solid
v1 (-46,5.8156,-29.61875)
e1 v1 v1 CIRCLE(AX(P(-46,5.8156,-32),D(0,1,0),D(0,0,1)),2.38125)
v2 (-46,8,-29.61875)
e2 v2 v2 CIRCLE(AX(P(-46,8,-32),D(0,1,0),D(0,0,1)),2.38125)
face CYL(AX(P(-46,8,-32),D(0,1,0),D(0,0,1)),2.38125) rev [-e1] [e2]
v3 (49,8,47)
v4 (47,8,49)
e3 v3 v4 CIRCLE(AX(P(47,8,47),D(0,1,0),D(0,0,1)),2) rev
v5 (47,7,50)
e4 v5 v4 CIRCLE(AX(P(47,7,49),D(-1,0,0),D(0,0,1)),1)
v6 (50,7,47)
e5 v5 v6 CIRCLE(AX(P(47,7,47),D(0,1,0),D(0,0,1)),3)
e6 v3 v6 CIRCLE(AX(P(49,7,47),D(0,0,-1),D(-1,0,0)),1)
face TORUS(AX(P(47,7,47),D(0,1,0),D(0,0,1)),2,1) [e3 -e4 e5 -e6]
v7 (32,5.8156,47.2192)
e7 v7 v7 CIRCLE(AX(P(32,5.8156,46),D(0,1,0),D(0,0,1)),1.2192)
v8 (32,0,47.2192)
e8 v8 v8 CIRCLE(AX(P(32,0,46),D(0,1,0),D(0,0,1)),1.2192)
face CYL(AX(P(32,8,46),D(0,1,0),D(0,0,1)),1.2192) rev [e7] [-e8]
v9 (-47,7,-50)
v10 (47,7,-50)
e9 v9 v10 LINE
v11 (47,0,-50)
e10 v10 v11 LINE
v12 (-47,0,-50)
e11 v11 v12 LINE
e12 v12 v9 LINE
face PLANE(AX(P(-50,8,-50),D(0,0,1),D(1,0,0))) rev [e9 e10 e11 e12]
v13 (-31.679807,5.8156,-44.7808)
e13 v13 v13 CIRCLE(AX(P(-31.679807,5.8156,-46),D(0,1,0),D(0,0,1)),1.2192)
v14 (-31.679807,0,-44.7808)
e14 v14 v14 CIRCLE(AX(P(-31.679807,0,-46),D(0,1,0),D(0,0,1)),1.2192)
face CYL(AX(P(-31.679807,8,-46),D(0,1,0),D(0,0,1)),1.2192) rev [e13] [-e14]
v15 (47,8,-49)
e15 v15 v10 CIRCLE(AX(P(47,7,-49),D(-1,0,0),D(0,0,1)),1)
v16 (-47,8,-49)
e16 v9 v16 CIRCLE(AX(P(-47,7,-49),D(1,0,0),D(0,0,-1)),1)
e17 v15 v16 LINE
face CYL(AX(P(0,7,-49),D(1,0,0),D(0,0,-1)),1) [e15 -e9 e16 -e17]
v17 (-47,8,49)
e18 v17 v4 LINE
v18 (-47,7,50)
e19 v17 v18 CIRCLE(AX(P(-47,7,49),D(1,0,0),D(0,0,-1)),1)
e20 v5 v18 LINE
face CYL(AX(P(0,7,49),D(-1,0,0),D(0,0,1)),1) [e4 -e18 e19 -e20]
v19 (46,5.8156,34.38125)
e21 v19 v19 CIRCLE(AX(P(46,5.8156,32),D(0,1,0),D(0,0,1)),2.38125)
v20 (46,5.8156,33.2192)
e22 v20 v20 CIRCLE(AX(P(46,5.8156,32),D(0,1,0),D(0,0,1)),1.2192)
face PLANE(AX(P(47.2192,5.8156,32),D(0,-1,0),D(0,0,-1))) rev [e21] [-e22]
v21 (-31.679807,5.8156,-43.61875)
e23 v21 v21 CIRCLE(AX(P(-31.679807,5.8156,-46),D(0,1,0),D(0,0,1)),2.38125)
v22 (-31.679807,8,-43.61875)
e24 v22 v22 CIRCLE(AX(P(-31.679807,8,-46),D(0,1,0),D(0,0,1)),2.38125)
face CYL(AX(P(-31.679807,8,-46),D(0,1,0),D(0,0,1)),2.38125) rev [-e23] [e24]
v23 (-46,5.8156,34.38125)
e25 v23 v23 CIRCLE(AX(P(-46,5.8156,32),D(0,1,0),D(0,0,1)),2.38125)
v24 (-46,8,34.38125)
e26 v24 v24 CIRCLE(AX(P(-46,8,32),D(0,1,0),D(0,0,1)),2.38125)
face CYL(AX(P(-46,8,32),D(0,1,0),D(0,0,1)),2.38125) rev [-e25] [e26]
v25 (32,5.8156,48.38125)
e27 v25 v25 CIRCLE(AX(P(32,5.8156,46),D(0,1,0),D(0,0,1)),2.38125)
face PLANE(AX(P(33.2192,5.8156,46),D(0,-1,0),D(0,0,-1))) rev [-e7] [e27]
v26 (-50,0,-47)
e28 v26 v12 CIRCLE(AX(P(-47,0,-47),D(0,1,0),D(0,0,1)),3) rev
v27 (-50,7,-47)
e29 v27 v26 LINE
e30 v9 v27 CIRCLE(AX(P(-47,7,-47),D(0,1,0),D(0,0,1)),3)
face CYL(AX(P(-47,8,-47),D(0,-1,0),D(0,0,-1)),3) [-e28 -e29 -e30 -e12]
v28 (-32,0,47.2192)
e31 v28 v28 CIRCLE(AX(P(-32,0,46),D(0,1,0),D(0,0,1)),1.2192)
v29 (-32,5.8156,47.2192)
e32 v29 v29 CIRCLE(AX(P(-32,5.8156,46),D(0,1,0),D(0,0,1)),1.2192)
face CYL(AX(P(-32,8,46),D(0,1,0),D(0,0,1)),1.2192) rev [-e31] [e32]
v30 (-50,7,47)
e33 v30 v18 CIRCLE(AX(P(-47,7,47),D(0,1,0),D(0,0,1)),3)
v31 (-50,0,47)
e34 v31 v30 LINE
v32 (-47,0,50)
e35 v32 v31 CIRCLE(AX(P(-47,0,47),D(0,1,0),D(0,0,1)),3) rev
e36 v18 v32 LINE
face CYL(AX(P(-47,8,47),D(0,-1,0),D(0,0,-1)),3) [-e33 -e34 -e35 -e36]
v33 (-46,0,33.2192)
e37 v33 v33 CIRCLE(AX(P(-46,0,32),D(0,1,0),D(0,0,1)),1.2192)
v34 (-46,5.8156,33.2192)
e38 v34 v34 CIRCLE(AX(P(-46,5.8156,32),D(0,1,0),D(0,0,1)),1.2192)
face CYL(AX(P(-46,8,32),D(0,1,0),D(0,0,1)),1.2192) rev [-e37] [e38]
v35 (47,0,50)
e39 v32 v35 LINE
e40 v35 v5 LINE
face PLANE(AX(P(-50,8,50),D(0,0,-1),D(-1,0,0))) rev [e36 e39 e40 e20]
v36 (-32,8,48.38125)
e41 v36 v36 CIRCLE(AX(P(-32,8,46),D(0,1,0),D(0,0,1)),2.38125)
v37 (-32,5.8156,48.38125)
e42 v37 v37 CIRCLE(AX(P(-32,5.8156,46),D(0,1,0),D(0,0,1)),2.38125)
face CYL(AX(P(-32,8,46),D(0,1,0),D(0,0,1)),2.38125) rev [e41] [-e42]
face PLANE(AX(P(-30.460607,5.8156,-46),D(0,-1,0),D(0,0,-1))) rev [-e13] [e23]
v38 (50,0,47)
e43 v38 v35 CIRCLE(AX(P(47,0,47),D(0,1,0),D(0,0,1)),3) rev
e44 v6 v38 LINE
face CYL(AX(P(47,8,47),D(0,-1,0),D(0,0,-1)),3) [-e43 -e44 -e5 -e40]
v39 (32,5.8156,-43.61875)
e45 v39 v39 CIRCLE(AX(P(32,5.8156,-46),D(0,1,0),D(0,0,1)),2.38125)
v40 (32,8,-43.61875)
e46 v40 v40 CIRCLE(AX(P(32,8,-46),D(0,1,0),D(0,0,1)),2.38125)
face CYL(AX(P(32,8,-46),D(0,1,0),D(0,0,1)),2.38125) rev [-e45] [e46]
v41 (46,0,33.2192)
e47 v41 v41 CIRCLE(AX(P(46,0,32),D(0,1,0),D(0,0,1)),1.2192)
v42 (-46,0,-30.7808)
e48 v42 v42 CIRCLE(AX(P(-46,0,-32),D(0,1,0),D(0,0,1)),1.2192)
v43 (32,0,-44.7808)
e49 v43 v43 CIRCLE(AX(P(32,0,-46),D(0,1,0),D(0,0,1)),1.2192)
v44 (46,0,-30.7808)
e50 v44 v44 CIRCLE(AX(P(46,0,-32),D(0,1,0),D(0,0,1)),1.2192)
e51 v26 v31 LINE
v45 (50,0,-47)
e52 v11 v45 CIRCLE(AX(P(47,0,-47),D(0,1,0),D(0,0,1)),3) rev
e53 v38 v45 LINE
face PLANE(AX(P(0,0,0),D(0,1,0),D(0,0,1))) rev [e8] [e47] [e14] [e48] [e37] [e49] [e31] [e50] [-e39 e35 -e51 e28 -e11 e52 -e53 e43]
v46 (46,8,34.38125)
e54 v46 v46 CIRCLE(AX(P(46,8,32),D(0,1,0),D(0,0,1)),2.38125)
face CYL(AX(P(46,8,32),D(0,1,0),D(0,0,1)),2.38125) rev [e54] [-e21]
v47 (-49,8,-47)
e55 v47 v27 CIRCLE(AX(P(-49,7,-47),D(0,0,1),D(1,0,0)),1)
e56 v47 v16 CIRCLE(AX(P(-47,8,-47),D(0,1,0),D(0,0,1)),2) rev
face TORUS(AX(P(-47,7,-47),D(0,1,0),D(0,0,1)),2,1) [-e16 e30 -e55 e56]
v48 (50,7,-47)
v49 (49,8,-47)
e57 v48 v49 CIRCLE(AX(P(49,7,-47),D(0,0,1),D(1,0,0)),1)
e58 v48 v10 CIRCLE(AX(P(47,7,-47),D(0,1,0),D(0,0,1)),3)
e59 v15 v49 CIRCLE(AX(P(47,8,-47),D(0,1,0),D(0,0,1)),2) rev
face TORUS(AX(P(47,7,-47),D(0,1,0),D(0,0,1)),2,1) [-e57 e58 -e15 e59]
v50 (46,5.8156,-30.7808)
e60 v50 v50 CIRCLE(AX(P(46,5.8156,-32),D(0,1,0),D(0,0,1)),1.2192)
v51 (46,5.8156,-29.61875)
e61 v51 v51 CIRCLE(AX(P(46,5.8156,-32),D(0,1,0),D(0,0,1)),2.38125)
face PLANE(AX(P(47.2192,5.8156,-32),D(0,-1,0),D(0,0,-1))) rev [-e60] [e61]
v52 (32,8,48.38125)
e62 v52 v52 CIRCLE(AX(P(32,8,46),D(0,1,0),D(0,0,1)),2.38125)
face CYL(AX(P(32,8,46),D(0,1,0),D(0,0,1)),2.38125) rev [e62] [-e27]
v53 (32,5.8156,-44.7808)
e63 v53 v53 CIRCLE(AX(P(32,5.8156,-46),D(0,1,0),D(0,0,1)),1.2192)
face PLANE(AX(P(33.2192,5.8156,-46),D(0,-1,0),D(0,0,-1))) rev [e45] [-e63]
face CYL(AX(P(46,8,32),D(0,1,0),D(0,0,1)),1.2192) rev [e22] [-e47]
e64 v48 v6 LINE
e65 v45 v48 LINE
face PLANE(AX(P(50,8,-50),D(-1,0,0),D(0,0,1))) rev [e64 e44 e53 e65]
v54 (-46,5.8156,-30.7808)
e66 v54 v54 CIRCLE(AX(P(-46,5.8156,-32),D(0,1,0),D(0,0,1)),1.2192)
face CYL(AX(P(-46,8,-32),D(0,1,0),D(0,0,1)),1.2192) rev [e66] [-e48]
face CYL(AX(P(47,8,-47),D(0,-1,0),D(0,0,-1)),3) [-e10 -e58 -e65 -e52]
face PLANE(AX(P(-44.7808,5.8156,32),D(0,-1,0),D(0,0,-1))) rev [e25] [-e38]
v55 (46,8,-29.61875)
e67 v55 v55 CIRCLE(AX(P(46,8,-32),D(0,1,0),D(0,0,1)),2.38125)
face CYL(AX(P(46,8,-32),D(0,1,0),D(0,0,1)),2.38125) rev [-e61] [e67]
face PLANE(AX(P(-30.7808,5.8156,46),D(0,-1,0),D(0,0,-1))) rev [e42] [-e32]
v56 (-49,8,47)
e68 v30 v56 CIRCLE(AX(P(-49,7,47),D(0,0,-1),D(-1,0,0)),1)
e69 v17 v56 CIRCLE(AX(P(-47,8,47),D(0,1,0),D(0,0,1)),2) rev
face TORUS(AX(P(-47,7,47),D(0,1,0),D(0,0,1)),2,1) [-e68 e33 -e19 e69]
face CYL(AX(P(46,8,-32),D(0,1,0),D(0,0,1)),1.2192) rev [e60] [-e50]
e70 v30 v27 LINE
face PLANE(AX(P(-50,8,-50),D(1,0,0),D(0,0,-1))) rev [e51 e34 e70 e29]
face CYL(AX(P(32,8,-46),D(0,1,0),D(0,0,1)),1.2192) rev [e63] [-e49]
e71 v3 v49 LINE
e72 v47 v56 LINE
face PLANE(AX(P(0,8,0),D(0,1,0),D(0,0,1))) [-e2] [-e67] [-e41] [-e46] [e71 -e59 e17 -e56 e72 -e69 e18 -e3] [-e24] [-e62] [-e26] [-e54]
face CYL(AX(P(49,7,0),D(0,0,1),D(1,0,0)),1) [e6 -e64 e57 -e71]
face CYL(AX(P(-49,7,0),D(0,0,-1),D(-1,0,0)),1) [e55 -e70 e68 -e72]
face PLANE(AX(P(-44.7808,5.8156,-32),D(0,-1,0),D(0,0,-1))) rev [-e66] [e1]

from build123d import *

# Parameters (mm, degrees)
SKETCH3_W                                      = 100
SKETCH3_H                                      = 100
BOSS_EXTRUDE2_DEPTH                            = 8
CBORE_FOR_2_SOCKET_HEAD_CAP_SCREW1_D           = 2.4384
CBORE_FOR_2_SOCKET_HEAD_CAP_SCREW1_CBORE_D     = 4.7625
CBORE_FOR_2_SOCKET_HEAD_CAP_SCREW1_CBORE_DEPTH = 2.1844
FILLET1_R                                      = 1
FILLET2_R                                      = 3
FILLET3_R                                      = 3


with BuildPart() as part:
    # Sketch3 → Boss-Extrude2 (new body)
    with BuildSketch(Plane(origin=(0, 0, 0), x_dir=(1, 0, 0), z_dir=(0, 1, 0))):
        Rectangle(SKETCH3_W, SKETCH3_H)
    extrude(amount=BOSS_EXTRUDE2_DEPTH)

    # CBORE for #2 Socket Head Cap Screw1 (through all)
    with Locations(Plane(origin=(-46, 8, 32), x_dir=(0, 0, 1), z_dir=(0, 1, 0))):
        with Locations((0, 0), (14, 14), (-64, 0), (-78, 14.320192801), (-78, 78), (-64, 92), (14, 78), (0, 92)):
            CounterBoreHole(CBORE_FOR_2_SOCKET_HEAD_CAP_SCREW1_D / 2, CBORE_FOR_2_SOCKET_HEAD_CAP_SCREW1_CBORE_D / 2, CBORE_FOR_2_SOCKET_HEAD_CAP_SCREW1_CBORE_DEPTH)

    # Fillet1
    fillet1_edges = [part.edges().sort_by_distance(p)[0] for p in [
        (-50, 8, 0),
        (0, 8, 50),
        (50, 8, 0),
        (0, 8, -50),
    ]]
    fillet(fillet1_edges, radius=FILLET1_R)

    # Fillet2
    # the kernel refuses this fillet: 3 mm, written as the material it takes off along each edge
    with BuildSketch(Plane(origin=(-47, 8, -47), x_dir=(0, 0, -1), z_dir=(1, 0, 0))) as fillet2_piece_1:
        with BuildLine():
            CenterArc((2, -1), 1, 0, 90)
            Line((3, -1), (3, 0))
            Line((3, 0), (2, 0))
        make_face()
    revolve(axis=Axis((-47, 8, -47), (0, 1, 0)), revolution_arc=90, mode=Mode.SUBTRACT)
    with BuildSketch(Plane(origin=(47, 8, -47), x_dir=(1, 0, 0), z_dir=(0, 0, 1))) as fillet2_piece_2:
        with BuildLine():
            CenterArc((2, -1), 1, 0, 90)
            Line((3, -1), (3, 0))
            Line((3, 0), (2, 0))
        make_face()
    revolve(axis=Axis((47, 8, -47), (0, 1, 0)), revolution_arc=90, mode=Mode.SUBTRACT)
    with BuildSketch(Plane(origin=(-47, 8, 47), x_dir=(-1, 0, 0), z_dir=(0, 0, -1))) as fillet2_piece_3:
        with BuildLine():
            CenterArc((2, -1), 1, 0, 90)
            Line((3, -1), (3, 0))
            Line((3, 0), (2, 0))
        make_face()
    revolve(axis=Axis((-47, 8, 47), (0, 1, 0)), revolution_arc=90, mode=Mode.SUBTRACT)
    with BuildSketch(Plane(origin=(-50, -7.5, 50), x_dir=(0, 0, -1), z_dir=(0, 1, 0)), Plane(origin=(-50, -7.5, -50), x_dir=(1, 0, 0), z_dir=(0, 1, 0))) as fillet2_piece_4:
        with BuildLine():
            CenterArc((FILLET2_R, -FILLET2_R), FILLET2_R, 90, 90)
            Line((0, -FILLET2_R), (0, 0))
            Line((0, 0), (FILLET2_R, 0))
        make_face()
    extrude(amount=15.5, mode=Mode.SUBTRACT)
    with BuildSketch(Plane(origin=(50, -7.5, -50), x_dir=(-1, 0, 0), z_dir=(0, 1, 0))) as fillet2_piece_5:
        with BuildLine():
            CenterArc((FILLET2_R, FILLET2_R), FILLET2_R, 180, 90)
            Line((0, FILLET2_R), (0, 0))
            Line((0, 0), (FILLET2_R, 0))
        make_face()
    extrude(amount=15.5, mode=Mode.SUBTRACT)

    # Fillet3
    # the kernel refuses this fillet: 3 mm, written as the material it takes off along each edge
    with BuildSketch(Plane(origin=(47, 8, 47), x_dir=(0, 0, 1), z_dir=(-1, 0, 0))) as fillet3_piece_1:
        with BuildLine():
            CenterArc((2, -1), 1, 0, 90)
            Line((3, -1), (3, 0))
            Line((3, 0), (2, 0))
        make_face()
    revolve(axis=Axis((47, 8, 47), (0, 1, 0)), revolution_arc=90, mode=Mode.SUBTRACT)
    with BuildSketch(Plane(origin=(50, -7.5, 50), x_dir=(-1, 0, 0), z_dir=(0, 1, 0))) as fillet3_piece_2:
        with BuildLine():
            CenterArc((FILLET3_R, -FILLET3_R), FILLET3_R, 90, 90)
            Line((0, -FILLET3_R), (0, 0))
            Line((0, 0), (FILLET3_R, 0))
        make_face()
    extrude(amount=15.5, mode=Mode.SUBTRACT)


solid = part.part
